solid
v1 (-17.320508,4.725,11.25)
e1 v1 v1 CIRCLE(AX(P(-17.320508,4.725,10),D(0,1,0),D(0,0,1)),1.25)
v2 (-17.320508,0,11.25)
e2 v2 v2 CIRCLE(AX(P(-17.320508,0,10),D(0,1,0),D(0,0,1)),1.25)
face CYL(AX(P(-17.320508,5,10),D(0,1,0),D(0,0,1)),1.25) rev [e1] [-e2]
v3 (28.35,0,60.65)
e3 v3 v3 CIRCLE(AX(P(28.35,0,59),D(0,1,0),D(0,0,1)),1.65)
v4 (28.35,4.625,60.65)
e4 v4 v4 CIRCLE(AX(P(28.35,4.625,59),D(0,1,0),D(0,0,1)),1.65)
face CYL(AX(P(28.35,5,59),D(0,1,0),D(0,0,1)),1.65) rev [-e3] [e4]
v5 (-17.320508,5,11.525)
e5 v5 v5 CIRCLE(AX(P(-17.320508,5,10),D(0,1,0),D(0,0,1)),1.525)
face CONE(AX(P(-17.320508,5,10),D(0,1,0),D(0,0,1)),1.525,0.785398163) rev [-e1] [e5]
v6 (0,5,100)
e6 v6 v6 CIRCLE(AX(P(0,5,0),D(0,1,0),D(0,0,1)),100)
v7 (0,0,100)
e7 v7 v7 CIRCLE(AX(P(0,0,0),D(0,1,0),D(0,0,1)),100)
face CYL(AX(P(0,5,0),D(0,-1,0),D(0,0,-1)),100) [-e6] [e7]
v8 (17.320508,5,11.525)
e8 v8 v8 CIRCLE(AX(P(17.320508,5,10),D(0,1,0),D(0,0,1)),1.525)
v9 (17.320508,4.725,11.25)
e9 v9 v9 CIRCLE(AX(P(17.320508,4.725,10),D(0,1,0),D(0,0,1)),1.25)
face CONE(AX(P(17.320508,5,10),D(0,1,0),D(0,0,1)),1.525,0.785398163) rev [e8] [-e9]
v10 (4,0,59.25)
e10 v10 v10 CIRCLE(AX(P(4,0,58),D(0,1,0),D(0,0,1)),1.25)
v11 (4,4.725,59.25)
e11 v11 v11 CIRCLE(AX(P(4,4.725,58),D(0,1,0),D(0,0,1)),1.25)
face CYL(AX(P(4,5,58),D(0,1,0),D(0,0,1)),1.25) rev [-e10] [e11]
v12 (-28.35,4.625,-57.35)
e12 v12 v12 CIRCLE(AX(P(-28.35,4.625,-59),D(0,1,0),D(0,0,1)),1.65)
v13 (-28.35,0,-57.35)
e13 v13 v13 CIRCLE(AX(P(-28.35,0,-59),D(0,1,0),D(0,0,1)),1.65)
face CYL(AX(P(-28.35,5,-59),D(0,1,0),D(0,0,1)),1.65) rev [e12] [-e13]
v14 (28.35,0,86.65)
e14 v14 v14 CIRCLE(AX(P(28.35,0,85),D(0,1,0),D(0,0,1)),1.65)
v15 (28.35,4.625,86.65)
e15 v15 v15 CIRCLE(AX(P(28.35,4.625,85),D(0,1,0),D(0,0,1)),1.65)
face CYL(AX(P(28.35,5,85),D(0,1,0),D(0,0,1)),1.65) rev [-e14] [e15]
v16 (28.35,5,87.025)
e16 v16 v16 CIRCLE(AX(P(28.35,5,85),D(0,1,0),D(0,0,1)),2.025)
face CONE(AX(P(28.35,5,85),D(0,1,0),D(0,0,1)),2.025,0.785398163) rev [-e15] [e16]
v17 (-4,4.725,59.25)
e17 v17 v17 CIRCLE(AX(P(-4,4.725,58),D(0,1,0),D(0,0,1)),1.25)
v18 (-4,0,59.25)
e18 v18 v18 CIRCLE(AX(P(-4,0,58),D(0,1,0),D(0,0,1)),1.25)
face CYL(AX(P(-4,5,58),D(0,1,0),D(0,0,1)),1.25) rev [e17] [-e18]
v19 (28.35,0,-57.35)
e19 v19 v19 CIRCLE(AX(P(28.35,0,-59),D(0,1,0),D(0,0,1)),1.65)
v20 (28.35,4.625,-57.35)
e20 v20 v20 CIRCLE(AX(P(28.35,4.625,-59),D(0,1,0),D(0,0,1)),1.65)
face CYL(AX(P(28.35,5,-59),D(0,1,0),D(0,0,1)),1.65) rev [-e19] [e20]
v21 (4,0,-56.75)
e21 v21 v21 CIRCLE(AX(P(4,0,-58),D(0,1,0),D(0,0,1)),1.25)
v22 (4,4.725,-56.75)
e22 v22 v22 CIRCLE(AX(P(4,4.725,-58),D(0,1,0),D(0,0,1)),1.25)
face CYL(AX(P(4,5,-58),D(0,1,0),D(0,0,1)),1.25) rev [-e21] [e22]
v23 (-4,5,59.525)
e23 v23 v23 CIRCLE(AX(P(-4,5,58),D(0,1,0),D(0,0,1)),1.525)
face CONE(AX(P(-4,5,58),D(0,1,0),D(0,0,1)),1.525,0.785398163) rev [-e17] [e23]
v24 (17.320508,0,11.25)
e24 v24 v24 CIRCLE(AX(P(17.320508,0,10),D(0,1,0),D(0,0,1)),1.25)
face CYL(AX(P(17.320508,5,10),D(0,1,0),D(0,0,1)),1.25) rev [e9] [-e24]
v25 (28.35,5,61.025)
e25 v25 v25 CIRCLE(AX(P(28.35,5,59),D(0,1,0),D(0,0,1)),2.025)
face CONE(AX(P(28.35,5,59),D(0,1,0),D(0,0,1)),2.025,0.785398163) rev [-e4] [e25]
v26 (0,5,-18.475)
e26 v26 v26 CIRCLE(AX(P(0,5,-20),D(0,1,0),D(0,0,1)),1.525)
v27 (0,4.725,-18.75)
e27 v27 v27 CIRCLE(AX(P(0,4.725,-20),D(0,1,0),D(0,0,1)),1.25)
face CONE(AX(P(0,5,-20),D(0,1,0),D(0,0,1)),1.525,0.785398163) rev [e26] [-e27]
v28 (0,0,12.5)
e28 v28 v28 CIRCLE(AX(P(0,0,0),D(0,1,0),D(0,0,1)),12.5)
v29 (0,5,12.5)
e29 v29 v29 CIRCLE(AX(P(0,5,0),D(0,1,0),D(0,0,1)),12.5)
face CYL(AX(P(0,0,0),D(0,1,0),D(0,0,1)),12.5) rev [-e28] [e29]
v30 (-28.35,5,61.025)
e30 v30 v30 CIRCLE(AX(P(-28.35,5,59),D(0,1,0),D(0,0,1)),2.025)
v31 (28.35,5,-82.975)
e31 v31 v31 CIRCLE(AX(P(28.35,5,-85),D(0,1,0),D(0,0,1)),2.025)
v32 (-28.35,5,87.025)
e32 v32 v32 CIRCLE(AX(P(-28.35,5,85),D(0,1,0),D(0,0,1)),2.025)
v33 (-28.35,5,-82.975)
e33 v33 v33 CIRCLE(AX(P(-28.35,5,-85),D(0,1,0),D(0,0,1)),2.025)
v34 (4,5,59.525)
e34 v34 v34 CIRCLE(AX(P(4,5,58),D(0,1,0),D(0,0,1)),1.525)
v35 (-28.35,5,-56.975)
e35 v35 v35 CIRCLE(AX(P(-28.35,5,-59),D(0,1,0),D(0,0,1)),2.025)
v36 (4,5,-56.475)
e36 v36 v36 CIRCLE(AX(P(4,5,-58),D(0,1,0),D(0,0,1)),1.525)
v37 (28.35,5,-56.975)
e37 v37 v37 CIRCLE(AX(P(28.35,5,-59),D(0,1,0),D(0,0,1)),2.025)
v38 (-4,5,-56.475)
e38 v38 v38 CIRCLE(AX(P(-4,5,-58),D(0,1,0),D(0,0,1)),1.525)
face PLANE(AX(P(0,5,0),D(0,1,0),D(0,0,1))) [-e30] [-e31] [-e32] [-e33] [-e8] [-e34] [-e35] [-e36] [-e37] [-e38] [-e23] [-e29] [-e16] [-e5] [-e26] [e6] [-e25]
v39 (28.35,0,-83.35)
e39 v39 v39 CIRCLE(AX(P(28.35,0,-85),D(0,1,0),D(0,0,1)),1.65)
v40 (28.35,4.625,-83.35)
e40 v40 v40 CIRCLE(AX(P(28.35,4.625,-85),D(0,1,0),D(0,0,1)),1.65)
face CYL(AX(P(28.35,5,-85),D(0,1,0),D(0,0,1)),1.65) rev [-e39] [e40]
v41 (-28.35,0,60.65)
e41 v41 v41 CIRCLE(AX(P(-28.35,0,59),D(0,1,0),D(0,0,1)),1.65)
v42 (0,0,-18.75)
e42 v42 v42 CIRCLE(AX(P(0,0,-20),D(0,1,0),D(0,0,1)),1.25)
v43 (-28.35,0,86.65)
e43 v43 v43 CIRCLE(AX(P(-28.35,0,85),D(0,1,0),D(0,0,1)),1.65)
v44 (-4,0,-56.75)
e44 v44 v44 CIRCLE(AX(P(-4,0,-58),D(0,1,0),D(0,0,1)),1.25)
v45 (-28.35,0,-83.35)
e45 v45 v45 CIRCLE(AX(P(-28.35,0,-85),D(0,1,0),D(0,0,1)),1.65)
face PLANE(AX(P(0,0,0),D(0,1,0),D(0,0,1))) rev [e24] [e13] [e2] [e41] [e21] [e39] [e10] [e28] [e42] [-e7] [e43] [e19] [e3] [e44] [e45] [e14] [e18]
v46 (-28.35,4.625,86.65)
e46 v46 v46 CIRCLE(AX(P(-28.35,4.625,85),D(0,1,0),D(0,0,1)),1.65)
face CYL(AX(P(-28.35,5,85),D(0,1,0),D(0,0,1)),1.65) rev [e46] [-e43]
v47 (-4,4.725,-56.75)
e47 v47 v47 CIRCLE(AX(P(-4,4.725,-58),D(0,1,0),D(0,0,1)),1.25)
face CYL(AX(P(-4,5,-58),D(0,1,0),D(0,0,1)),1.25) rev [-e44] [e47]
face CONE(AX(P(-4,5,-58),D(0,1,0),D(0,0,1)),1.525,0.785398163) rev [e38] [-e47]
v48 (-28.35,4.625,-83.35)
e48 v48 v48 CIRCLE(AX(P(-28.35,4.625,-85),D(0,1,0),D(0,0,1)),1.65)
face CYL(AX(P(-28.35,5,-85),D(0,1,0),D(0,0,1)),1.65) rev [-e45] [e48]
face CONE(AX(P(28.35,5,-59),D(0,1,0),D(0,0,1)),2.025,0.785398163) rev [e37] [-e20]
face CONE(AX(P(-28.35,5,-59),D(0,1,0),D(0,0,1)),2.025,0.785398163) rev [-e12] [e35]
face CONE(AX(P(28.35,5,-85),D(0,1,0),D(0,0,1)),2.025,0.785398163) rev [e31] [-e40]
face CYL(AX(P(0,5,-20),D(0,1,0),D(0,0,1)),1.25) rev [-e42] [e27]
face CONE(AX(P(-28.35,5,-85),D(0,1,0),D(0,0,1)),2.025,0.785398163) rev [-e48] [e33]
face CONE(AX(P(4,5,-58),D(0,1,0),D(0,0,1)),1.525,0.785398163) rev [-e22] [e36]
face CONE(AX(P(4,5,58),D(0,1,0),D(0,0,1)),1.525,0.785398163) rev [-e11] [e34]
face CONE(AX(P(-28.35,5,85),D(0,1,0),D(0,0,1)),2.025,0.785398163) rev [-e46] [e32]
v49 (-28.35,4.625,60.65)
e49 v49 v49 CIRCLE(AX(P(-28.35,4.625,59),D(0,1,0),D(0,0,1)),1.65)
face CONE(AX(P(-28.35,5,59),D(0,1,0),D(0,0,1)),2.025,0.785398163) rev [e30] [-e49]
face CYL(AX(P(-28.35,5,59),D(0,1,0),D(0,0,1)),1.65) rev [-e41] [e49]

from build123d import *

# Parameters (mm, degrees)
SKETCH_1_R                   = 100
EXTRUDE_1_DEPTH              = 5
HOLE_WIZARD_M3_1_D           = 2.5
HOLE_WIZARD_M3_1_CSINK_D     = 3.05
HOLE_WIZARD_M3_1_CSINK_ANGLE = 90
SKETCH_5_R                   = 12.5
CUT_EXTRUDE_1_DEPTH          = 142.509716981
HOLE_WIZARD_M4_2_D           = 3.3
HOLE_WIZARD_M4_2_DEPTH       = 5
HOLE_WIZARD_M4_2_CSINK_D     = 4.05
HOLE_WIZARD_M4_2_CSINK_ANGLE = 90


# Read off the part's stored shape, not the designer's step: M3 螺纹孔2
with BuildPart() as part:
    # 草图1 → 凸台-拉伸1 (new body)
    with BuildSketch(Plane(origin=(0, 0, 0), x_dir=(1, 0, 0), z_dir=(0, 1, 0))):
        with Locations(Location((0, 0, 0), (0, 0, 270))):
            Circle(SKETCH_1_R)
    extrude(amount=EXTRUDE_1_DEPTH)

    # M3 螺纹孔1 (through all)
    with Locations(Plane(origin=(0, 5, 0), x_dir=(1, 0, 0), z_dir=(0, 1, 0))):
        with Locations((0, 20), (17.320508076, -10), (-17.320508076, -10)):
            CounterSinkHole(HOLE_WIZARD_M3_1_D / 2, HOLE_WIZARD_M3_1_CSINK_D / 2, counter_sink_angle=HOLE_WIZARD_M3_1_CSINK_ANGLE)

    # 草图5 → 切除-拉伸1 (cut, through all)
    with BuildSketch(Plane(origin=(0, 5, 0), x_dir=(1, 0, 0), z_dir=(0, 1, 0))):
        with Locations(Location((0, 0, 0), (0, 0, 270))):
            Circle(SKETCH_5_R)
    extrude(amount=-CUT_EXTRUDE_1_DEPTH, mode=Mode.SUBTRACT)

    # M4 螺纹孔2
    with Locations(Plane(origin=(0, 5, 0), x_dir=(1, 0, 0), z_dir=(0, 1, 0))):
        with Locations((0, 0), (-28.35, 85), (28.35, 85), (28.35, -85), (-28.35, -85), (-28.35, 59), (28.35, 59), (-28.35, -59), (28.35, -59)):
            CounterSinkHole(HOLE_WIZARD_M4_2_D / 2, HOLE_WIZARD_M4_2_CSINK_D / 2, depth=HOLE_WIZARD_M4_2_DEPTH, counter_sink_angle=HOLE_WIZARD_M4_2_CSINK_ANGLE)

    # M3 螺纹孔2 outline → M3 螺纹孔2 (revolve, cut)
    with BuildSketch(Plane(origin=(4, 0, 58), x_dir=(1, 0, 0), z_dir=(0, 0, 1))):
        Polygon((0, 0), (1.25, 0), (1.25, 4.725), (1.525, 5), (0, 5), align=None)
    revolve(axis=Axis((4, 0, 58), (0, 1, 0)), mode=Mode.SUBTRACT)

    # Hole Wizard M3 _2 2 outline → Hole Wizard M3 _2 2 (revolve, cut)
    with BuildSketch(Plane(origin=(-4, 0, 58), x_dir=(1, 0, 0), z_dir=(0, 0, 1))):
        Polygon((0, 0), (1.25, 0), (1.25, 4.725), (1.525, 5), (0, 5), align=None)
    revolve(axis=Axis((-4, 0, 58), (0, 1, 0)), mode=Mode.SUBTRACT)

    # Hole Wizard M3 _2 3 outline → Hole Wizard M3 _2 3 (revolve, cut)
    with BuildSketch(Plane(origin=(4, 0, -58), x_dir=(1, 0, 0), z_dir=(0, 0, 1))):
        Polygon((0, 0), (1.25, 0), (1.25, 4.725), (1.525, 5), (0, 5), align=None)
    revolve(axis=Axis((4, 0, -58), (0, 1, 0)), mode=Mode.SUBTRACT)

    # Hole Wizard M3 _2 4 outline → Hole Wizard M3 _2 4 (revolve, cut)
    with BuildSketch(Plane(origin=(-4, 0, -58), x_dir=(1, 0, 0), z_dir=(0, 0, 1))):
        Polygon((0, 0), (1.25, 0), (1.25, 4.725), (1.525, 5), (0, 5), align=None)
    revolve(axis=Axis((-4, 0, -58), (0, 1, 0)), mode=Mode.SUBTRACT)


solid = part.part
